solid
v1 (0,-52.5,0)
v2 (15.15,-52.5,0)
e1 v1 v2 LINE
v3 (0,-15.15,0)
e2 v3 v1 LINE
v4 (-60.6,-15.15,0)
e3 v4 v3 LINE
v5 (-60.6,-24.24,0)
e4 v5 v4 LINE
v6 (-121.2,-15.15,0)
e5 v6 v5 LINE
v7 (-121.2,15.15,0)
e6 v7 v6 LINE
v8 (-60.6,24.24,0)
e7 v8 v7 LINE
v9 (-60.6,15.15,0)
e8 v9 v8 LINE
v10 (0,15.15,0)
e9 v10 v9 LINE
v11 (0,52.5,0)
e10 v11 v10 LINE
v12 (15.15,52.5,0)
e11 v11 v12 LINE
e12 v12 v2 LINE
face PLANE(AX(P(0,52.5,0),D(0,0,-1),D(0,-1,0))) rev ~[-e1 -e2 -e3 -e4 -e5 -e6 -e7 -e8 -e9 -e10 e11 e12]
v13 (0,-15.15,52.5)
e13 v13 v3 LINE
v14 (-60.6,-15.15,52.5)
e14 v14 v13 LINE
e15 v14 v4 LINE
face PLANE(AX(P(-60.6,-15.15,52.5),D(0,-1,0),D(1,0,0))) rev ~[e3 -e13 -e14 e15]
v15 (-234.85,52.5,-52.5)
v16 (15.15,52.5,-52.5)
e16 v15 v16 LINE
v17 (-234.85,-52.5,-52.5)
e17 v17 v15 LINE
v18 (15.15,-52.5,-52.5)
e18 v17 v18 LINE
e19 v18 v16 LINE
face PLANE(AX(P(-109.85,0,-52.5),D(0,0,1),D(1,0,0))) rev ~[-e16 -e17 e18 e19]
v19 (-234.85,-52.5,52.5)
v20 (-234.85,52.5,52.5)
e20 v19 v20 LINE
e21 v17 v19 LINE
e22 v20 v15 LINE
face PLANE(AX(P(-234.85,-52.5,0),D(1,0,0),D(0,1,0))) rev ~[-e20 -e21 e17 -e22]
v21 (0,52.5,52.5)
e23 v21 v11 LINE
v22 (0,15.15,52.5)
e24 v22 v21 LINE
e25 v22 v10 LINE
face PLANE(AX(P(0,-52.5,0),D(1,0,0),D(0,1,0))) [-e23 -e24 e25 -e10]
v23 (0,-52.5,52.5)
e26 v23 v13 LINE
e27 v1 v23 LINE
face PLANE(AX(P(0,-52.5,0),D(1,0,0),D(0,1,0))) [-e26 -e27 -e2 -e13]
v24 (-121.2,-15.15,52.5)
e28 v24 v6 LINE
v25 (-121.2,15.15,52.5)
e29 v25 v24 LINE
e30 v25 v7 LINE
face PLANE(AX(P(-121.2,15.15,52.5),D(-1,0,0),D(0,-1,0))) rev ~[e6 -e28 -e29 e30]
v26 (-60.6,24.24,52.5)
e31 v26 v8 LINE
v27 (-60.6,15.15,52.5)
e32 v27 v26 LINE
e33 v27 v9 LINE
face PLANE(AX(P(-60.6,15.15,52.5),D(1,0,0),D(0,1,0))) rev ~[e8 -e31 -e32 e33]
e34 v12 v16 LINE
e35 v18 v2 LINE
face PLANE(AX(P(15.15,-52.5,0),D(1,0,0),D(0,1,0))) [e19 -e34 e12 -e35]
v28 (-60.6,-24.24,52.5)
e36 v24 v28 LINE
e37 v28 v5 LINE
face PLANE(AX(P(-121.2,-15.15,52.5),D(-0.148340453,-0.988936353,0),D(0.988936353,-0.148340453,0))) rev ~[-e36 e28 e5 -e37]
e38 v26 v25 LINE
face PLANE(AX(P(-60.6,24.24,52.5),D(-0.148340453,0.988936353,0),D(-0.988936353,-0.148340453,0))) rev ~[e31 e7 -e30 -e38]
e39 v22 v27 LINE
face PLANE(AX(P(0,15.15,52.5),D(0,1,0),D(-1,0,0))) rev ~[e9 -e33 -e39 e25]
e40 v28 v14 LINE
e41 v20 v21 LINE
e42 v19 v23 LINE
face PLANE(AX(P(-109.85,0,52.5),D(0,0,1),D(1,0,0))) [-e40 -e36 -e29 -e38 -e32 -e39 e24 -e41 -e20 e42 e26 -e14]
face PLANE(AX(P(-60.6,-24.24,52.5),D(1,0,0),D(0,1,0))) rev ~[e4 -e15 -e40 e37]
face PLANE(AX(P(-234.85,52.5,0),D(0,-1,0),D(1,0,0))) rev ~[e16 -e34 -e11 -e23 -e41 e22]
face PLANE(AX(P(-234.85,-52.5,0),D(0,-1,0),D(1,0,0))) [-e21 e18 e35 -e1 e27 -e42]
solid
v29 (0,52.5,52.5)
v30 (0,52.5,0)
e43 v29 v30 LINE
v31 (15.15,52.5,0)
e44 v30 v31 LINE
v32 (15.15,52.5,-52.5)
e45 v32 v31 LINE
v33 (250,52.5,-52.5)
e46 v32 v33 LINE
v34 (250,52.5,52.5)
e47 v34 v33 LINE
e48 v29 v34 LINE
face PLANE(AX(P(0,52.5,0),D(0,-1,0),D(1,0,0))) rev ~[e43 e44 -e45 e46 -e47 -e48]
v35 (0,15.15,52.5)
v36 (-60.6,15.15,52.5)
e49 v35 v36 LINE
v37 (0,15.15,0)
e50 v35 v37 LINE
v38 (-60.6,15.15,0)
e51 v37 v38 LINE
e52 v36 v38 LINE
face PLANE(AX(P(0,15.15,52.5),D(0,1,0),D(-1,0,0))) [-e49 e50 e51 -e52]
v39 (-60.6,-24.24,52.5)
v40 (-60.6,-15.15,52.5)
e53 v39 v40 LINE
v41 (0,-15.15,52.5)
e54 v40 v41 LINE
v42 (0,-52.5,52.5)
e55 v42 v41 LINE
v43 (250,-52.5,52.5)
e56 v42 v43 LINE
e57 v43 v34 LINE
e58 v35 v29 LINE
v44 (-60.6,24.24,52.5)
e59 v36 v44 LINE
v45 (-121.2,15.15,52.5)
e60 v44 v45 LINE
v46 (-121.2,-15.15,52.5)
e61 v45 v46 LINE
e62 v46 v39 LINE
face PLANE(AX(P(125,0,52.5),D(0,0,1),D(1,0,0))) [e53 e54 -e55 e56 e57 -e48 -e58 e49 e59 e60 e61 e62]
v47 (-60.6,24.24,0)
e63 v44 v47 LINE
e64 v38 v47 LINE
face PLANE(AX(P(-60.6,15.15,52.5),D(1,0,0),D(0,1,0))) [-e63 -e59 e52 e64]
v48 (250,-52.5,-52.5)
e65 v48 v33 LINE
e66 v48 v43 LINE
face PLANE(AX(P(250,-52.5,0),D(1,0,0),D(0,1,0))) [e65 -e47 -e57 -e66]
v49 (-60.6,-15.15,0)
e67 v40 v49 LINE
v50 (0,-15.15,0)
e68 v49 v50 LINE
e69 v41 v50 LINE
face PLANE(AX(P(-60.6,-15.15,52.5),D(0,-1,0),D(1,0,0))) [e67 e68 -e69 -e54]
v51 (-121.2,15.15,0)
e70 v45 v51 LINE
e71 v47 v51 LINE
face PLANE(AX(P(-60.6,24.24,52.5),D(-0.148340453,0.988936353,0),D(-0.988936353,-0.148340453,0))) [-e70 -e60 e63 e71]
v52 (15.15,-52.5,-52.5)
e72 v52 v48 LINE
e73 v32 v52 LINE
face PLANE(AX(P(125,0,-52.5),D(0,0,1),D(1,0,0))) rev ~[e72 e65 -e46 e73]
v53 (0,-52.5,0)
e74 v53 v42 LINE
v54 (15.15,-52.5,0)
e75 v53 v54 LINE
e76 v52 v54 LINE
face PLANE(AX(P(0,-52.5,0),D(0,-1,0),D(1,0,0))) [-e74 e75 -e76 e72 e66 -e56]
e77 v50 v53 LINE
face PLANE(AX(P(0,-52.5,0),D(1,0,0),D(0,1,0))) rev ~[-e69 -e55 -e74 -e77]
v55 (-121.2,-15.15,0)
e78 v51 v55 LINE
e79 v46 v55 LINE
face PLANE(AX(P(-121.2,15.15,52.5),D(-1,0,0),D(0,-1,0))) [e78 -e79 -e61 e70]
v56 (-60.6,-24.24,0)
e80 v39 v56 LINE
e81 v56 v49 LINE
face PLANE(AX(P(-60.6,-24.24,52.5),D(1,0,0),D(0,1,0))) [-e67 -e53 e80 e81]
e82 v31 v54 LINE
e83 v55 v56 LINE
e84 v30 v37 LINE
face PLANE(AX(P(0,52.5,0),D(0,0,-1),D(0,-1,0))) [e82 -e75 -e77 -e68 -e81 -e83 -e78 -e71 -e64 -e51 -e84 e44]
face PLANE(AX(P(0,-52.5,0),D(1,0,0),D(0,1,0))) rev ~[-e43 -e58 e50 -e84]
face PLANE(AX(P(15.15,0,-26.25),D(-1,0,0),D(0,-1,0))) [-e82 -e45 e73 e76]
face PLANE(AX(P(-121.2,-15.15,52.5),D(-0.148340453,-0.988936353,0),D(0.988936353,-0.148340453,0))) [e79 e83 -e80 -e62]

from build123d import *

# Parameters (mm, degrees)
F0_W          = 250
F0_H          = 105
F1_DEPTH      = 52.5
F2_W          = 105
F2_H          = 52.5
F3_DEPTH      = 15.15
F5_DEPTH      = 52.5
F6_W          = 250
F6_H          = 105
F7_DEPTH      = 52.5
F7_DEPTH_BACK = 52.5


with BuildPart() as f1:
    # F0 (on Top) → F1 (new body, symmetric)
    with BuildSketch(Plane.XY):
        with Locations((125, 0)):
            Rectangle(F0_W, F0_H)
    extrude(amount=F1_DEPTH, both=True)

    # F2 (on face) → F3 (cut)
    with BuildSketch(Plane(origin=(0, 0, 0), x_dir=(0, -1, 0), z_dir=(-1, 0, 0))):
        with Locations((0, -26.25)):
            Rectangle(F2_W, F2_H)
    extrude(amount=-F3_DEPTH, mode=Mode.SUBTRACT)

    # F4 (on face) → F5 (join, through all)
    with BuildSketch(Plane.XY.offset(52.5)):
        Polygon((0, -15.15), (0, 15.15), (-60.6, 15.15), (-60.6, 24.24), (-121.2, 15.15), (-121.2, -15.15), (-60.6, -24.24), (-60.6, -15.15), align=None)
    extrude(amount=-F5_DEPTH)


with BuildPart() as f7:
    # F6 (on Top) → F7 (new body, two sides)
    with BuildSketch(Plane.XY) as f7_sk:
        with Locations((-109.85, 0)):
            Rectangle(F6_W, F6_H)
    extrude(amount=F7_DEPTH)
    extrude(f7_sk.sketch, amount=-F7_DEPTH_BACK)

    # F8: cut F1
    add(f1.part, mode=Mode.SUBTRACT)


solid = Compound([f1.part, f7.part])
